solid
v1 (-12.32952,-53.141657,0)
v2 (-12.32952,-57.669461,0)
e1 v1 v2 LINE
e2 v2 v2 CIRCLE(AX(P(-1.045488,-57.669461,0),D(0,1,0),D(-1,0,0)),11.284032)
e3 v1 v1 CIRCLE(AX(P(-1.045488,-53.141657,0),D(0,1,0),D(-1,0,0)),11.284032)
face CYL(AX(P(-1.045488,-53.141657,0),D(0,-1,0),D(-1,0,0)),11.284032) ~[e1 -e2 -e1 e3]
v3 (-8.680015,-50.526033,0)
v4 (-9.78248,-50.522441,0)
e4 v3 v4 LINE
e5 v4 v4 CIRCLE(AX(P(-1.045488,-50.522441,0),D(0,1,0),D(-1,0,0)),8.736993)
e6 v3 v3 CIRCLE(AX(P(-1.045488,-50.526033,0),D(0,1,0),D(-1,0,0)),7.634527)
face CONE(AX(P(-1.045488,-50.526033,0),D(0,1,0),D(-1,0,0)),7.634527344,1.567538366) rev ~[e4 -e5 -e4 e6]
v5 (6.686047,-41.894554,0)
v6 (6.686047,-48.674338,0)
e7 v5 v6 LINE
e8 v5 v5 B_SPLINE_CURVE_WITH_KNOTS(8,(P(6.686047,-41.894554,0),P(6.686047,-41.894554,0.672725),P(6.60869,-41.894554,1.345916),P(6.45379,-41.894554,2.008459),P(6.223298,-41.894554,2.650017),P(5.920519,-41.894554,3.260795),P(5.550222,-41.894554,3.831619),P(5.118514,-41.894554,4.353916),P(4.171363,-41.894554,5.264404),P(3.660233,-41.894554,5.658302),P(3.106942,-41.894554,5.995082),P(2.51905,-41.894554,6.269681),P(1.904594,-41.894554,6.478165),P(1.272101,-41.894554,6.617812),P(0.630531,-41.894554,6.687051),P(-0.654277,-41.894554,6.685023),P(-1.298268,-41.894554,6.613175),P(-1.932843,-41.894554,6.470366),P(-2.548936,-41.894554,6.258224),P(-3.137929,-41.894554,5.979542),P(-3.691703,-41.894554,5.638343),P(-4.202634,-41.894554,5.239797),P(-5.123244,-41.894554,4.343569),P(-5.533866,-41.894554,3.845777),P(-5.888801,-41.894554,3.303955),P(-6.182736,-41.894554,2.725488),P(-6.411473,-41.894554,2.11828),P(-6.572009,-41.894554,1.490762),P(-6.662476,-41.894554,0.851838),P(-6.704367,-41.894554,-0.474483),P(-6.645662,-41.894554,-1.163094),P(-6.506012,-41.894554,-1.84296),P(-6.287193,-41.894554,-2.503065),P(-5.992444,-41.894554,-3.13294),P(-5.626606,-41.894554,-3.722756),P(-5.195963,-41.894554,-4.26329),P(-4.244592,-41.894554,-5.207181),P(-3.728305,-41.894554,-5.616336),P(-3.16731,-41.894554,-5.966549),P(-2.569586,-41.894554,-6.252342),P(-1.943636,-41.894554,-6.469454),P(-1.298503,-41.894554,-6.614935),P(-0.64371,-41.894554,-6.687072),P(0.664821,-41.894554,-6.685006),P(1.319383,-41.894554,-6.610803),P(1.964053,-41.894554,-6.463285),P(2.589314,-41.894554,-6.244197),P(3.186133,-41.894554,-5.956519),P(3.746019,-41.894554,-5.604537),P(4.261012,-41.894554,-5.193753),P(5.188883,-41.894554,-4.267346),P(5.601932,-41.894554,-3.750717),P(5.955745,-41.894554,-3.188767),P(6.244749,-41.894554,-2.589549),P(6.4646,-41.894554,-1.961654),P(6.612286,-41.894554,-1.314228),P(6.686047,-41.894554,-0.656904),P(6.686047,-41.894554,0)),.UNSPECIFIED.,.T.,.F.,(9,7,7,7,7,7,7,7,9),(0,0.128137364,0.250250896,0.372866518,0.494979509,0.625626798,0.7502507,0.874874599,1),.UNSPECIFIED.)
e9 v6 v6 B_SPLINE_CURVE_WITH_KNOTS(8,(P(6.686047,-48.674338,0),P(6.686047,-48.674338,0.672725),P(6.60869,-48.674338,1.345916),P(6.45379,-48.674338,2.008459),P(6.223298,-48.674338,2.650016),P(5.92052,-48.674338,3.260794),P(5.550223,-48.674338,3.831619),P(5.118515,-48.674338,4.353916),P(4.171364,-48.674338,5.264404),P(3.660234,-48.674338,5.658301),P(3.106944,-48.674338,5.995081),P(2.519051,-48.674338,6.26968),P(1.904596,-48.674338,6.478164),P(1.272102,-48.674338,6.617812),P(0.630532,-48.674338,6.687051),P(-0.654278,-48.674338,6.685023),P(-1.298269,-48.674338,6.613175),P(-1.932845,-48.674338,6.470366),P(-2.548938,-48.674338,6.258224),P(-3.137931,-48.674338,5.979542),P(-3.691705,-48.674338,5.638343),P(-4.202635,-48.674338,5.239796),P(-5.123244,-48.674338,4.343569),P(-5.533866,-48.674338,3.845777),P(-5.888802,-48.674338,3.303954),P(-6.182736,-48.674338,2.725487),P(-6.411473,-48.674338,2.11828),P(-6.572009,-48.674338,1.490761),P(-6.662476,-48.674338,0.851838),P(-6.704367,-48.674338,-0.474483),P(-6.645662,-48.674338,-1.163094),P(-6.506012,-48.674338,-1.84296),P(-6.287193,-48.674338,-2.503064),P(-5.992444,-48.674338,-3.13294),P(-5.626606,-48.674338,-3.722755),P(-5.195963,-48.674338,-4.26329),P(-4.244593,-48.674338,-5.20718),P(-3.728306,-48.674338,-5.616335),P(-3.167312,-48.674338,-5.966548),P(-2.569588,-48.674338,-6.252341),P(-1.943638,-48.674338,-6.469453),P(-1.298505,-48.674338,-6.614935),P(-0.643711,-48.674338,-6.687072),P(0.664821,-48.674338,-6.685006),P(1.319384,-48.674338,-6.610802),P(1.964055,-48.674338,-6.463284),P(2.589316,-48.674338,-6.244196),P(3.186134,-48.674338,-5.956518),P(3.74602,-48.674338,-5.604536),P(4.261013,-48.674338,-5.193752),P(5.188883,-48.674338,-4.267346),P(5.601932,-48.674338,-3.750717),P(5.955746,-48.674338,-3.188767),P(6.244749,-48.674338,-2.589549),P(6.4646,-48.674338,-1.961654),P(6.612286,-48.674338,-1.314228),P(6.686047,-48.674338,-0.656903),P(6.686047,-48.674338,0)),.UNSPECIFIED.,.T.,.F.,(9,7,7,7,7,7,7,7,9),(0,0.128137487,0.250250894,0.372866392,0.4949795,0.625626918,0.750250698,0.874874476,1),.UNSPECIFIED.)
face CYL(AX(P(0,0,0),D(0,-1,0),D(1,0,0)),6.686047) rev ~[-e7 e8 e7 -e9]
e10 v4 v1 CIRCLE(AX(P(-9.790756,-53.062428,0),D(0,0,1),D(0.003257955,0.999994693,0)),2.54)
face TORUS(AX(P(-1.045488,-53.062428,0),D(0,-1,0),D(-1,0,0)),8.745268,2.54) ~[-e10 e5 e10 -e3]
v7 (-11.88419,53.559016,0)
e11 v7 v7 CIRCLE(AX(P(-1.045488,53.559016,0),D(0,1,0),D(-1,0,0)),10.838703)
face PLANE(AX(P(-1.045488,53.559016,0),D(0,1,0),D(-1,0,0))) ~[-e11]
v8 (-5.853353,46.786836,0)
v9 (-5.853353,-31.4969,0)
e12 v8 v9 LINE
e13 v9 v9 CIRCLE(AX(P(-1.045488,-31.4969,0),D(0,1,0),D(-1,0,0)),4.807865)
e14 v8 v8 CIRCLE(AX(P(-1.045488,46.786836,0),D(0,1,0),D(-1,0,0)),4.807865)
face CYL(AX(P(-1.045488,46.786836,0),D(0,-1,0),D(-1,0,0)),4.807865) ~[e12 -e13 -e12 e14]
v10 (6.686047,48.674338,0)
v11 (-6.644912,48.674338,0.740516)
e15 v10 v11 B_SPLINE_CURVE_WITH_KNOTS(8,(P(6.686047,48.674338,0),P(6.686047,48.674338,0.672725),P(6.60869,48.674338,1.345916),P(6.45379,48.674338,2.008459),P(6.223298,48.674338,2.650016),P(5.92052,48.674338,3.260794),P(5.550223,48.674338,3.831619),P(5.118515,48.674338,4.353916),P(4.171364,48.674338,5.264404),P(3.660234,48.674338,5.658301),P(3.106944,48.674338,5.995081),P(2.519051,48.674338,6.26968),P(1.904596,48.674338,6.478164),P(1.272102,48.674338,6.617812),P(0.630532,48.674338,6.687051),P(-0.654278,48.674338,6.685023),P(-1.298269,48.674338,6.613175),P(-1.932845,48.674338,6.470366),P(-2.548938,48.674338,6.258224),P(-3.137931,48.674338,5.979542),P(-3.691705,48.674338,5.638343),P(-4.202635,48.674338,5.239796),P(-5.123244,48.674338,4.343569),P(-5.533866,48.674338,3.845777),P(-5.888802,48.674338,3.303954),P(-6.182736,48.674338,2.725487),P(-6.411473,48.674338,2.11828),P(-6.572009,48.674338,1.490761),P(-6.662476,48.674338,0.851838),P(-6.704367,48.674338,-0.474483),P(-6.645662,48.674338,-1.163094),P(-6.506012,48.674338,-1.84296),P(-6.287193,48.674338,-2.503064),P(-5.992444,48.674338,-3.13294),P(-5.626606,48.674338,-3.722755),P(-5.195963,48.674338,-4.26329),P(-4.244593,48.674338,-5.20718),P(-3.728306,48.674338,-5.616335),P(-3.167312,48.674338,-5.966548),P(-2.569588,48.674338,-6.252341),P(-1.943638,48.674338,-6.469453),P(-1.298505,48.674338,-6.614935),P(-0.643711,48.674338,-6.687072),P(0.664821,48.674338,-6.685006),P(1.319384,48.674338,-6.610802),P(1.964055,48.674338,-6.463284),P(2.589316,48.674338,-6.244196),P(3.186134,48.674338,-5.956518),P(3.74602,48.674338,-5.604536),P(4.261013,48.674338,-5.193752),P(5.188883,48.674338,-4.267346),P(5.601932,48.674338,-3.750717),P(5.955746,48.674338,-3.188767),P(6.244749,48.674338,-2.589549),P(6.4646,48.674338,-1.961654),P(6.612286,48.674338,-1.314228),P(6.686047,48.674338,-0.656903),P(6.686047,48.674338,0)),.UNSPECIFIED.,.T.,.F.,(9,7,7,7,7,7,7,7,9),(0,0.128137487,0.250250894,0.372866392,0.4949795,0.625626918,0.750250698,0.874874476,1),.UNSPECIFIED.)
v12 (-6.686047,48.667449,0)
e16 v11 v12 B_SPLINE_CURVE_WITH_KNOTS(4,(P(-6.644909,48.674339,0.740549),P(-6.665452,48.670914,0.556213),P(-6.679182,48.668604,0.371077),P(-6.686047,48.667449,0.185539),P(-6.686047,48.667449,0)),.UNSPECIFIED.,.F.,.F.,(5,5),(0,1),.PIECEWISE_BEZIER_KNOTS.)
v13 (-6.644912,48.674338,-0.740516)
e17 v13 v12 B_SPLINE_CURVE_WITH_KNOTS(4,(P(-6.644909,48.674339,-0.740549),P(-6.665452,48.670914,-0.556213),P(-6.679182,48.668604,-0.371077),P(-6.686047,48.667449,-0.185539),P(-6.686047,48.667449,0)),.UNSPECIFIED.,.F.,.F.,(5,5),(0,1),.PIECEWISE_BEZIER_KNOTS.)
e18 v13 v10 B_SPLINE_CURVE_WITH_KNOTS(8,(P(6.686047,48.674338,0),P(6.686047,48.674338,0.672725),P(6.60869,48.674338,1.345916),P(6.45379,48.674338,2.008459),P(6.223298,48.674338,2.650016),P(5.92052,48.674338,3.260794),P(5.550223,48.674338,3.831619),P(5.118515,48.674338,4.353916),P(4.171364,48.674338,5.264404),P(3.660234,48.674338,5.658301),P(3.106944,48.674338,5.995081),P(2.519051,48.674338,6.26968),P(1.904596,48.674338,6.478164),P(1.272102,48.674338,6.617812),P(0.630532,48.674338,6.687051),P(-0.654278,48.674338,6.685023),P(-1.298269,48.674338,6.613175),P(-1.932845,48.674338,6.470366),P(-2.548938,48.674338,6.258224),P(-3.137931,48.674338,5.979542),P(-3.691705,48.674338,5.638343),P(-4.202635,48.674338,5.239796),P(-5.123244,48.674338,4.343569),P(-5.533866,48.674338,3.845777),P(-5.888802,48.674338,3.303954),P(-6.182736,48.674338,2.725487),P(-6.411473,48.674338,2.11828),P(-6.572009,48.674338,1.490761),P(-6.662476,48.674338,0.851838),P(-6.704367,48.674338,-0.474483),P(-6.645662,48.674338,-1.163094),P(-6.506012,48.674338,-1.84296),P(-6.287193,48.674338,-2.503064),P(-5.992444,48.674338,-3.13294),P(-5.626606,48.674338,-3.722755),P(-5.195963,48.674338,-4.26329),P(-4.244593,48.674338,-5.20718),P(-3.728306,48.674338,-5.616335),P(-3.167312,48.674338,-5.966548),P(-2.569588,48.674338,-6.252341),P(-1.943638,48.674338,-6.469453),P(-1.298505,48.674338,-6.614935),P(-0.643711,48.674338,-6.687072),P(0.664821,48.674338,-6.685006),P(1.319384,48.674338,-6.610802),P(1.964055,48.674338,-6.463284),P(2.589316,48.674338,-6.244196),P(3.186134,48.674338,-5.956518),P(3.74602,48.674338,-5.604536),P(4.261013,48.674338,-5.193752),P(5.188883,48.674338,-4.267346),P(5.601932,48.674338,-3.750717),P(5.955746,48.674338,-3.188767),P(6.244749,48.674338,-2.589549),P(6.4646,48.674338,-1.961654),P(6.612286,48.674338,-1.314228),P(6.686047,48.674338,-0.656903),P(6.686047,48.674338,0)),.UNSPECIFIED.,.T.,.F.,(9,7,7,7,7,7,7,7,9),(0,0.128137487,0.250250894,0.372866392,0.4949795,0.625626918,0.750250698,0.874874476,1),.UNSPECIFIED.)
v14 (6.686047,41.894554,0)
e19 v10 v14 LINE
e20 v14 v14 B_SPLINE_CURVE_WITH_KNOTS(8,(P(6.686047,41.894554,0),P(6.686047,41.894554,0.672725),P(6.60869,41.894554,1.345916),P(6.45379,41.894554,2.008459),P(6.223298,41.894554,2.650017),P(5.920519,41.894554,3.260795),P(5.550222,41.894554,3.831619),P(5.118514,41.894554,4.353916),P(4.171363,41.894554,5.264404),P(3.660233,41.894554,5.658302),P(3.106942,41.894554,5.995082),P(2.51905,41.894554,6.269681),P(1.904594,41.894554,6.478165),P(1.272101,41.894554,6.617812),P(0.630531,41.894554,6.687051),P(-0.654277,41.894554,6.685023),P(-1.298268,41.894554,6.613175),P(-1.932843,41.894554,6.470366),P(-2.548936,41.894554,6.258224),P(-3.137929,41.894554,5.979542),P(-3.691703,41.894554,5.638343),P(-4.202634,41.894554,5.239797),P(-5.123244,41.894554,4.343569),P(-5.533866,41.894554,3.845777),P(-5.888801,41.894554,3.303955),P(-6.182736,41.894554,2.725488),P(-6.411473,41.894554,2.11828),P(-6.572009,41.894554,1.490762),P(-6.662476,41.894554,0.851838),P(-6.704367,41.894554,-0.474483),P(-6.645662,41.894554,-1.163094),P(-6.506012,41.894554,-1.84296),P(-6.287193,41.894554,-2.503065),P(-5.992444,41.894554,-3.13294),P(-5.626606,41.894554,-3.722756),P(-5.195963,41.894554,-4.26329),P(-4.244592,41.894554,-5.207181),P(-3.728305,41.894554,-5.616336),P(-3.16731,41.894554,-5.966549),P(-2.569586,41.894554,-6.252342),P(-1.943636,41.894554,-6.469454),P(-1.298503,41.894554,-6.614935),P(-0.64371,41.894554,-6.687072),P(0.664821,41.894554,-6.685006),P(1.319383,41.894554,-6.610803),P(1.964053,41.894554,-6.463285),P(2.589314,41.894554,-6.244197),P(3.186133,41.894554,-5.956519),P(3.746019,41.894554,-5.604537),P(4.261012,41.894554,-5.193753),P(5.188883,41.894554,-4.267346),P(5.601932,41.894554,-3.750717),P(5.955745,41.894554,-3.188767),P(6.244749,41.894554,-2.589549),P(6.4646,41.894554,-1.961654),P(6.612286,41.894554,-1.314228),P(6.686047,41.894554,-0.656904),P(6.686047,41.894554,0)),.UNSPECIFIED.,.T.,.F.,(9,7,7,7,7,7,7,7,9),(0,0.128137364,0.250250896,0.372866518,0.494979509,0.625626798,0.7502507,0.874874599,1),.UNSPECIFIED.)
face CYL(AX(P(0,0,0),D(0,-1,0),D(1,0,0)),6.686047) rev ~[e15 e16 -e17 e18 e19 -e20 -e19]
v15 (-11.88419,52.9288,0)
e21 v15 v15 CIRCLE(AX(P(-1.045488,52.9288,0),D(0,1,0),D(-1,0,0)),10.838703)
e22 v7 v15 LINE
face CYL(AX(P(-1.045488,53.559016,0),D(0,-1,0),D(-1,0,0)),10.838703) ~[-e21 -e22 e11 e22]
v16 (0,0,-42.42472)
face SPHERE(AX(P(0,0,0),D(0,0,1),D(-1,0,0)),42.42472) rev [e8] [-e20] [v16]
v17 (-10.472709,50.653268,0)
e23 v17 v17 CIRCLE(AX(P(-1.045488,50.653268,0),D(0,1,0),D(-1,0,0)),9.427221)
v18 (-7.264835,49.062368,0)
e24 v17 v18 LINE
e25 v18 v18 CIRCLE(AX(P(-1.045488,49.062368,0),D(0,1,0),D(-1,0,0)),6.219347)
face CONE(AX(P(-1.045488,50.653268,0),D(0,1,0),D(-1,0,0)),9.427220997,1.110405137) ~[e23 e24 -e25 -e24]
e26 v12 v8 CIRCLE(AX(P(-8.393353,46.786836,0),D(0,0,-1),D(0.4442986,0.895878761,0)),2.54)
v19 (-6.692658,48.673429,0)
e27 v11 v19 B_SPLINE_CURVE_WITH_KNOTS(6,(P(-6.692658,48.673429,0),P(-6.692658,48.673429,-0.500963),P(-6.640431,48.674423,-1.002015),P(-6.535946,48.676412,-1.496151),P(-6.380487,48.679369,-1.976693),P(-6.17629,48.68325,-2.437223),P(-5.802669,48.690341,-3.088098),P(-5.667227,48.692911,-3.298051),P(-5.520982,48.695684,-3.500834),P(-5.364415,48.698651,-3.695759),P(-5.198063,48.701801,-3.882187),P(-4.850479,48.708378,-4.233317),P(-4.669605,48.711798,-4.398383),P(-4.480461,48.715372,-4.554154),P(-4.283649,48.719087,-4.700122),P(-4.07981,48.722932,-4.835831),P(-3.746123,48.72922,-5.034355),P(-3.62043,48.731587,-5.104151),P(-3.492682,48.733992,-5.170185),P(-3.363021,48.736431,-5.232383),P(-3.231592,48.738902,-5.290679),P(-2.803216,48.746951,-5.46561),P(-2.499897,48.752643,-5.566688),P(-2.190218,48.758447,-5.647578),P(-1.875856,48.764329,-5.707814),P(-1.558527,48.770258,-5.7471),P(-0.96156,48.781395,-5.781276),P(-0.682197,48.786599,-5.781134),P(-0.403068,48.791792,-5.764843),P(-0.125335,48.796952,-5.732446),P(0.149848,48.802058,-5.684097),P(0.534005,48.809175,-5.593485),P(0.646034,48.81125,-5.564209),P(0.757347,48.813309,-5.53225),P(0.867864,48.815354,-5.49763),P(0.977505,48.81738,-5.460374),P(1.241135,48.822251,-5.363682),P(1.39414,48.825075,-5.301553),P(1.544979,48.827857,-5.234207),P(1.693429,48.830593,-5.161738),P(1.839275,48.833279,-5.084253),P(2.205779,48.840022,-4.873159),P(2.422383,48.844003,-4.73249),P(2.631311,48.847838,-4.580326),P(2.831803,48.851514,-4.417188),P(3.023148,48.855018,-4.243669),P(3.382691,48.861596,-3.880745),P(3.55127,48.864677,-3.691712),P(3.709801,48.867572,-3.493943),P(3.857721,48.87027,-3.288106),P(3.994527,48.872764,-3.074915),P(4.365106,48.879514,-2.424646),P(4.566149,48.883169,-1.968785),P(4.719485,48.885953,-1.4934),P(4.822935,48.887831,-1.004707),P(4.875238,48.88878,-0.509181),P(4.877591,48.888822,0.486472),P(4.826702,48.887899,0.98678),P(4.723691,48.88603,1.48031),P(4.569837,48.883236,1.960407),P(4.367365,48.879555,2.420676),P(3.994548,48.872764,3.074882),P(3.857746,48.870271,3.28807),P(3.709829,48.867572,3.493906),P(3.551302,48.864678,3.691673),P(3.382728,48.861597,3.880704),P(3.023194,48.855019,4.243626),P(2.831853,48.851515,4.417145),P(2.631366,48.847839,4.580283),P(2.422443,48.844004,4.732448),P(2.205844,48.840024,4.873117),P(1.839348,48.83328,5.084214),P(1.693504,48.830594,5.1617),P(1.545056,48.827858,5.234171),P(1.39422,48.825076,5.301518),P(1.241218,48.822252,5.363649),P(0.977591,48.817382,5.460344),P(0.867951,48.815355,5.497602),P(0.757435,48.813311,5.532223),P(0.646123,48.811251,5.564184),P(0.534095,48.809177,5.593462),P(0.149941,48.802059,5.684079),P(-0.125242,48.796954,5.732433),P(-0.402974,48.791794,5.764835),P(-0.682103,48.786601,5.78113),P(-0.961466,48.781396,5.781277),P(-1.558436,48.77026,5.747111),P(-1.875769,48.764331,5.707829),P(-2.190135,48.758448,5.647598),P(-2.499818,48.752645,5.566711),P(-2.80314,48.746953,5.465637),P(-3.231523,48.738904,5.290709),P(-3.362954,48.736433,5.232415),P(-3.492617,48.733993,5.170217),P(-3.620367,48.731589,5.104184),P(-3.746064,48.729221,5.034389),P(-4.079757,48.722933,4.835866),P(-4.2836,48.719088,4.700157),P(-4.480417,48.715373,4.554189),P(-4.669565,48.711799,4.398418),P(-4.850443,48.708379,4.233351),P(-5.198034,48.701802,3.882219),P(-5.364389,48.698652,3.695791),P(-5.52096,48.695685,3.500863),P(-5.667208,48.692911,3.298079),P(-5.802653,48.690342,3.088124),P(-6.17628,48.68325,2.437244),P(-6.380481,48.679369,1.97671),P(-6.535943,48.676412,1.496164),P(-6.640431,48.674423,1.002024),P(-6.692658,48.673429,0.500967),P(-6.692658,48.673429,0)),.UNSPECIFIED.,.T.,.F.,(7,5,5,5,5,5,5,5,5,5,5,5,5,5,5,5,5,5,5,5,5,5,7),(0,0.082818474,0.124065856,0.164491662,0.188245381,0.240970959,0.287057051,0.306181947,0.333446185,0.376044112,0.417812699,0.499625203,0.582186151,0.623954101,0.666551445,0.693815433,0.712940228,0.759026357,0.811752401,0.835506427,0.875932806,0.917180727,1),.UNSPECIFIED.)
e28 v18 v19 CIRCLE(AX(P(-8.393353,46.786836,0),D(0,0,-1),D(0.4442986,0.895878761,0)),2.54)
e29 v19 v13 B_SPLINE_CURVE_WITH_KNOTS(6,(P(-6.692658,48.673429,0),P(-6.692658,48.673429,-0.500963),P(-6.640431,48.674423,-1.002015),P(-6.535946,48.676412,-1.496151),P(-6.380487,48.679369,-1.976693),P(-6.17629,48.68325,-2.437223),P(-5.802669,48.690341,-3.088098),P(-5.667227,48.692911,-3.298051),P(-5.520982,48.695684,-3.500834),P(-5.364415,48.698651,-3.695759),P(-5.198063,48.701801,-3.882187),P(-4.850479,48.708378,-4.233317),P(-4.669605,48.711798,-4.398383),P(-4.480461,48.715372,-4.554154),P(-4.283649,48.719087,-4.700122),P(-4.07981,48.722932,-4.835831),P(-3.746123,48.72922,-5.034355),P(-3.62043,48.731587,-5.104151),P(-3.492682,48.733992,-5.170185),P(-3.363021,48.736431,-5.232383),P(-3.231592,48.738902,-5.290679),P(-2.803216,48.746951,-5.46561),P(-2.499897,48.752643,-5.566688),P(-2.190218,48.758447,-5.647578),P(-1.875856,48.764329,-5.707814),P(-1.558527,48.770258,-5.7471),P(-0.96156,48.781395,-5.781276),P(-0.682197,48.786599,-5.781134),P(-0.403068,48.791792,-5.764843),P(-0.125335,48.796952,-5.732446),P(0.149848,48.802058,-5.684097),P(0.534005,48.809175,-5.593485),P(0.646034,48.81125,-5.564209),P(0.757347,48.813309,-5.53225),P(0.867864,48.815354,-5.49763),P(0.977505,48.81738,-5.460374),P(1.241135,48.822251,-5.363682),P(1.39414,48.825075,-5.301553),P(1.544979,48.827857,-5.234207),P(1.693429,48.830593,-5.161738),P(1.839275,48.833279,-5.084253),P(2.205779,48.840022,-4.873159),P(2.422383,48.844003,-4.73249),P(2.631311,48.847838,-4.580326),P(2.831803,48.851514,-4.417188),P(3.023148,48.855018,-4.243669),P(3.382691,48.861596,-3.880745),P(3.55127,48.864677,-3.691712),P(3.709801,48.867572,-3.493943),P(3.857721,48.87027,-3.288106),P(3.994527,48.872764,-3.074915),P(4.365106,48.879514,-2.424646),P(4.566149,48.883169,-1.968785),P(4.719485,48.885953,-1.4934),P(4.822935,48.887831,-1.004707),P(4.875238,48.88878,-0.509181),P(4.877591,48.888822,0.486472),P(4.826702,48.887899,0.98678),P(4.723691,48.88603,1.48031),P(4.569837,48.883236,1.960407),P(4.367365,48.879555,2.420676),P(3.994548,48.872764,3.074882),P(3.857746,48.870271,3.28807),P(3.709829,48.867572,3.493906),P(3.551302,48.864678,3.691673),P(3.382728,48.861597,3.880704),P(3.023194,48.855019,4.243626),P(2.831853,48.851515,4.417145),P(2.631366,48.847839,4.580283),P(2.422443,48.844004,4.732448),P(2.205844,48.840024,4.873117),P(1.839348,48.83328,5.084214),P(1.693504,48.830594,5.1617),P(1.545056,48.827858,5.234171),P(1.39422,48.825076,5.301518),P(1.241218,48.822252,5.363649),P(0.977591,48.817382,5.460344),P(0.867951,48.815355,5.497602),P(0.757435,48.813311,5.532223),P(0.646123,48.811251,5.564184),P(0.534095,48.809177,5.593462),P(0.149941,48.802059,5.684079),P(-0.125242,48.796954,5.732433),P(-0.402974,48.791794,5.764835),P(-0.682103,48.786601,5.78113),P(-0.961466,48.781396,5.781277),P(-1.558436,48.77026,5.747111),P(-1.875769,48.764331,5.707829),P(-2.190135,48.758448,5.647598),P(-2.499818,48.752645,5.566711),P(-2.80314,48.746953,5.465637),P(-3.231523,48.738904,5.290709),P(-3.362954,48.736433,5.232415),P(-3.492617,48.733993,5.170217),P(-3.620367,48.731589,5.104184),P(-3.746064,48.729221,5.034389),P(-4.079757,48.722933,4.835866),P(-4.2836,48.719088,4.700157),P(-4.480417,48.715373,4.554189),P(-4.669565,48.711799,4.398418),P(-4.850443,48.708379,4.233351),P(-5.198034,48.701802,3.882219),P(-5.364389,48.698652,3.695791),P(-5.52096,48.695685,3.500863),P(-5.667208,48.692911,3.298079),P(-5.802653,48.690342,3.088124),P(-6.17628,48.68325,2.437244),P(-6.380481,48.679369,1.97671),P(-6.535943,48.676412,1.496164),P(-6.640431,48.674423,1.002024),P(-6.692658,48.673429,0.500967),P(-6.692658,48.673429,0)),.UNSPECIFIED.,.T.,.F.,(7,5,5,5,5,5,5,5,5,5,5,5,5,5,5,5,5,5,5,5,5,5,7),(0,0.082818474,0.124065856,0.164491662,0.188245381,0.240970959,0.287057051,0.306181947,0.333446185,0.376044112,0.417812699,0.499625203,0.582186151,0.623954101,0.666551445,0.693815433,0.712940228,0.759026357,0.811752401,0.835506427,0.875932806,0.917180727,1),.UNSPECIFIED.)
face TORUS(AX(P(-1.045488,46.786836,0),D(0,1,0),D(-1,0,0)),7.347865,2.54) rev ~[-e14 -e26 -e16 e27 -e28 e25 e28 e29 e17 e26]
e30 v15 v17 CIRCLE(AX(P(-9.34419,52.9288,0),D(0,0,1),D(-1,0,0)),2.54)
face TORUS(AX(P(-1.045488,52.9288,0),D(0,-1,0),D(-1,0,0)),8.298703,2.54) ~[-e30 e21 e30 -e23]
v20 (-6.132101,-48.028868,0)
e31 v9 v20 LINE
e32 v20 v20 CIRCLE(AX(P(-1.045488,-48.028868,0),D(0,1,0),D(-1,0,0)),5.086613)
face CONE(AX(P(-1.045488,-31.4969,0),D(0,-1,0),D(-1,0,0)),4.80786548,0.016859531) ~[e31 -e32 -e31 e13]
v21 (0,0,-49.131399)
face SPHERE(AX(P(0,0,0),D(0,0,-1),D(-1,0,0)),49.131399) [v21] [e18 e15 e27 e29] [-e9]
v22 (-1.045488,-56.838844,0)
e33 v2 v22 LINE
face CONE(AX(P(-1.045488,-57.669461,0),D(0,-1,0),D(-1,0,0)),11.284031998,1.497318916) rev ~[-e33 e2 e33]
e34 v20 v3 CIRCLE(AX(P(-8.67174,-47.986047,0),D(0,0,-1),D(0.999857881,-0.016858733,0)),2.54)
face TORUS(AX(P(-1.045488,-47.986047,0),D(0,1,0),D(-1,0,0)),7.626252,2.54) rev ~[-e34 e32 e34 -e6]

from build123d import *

# Parameters (mm, degrees)
F2_R     = 6.6860470745
F3_DEPTH = 59.436


# Not quite as in the source:
# - a feature of the source that left no trace in its solid (it failed there, or was rolled back) is left out


with BuildPart() as f1:
    # F0 (on Front) → F1 (revolve)
    with BuildSketch(Plane.XZ):
        with BuildLine():
            Line((0, -49.1313993841), (0, -47.4085077537))
            Line((0, -47.4085077537), (0, -42.4247202843))
            ThreePointArc((0, -42.4247202843), (-42.4247202843, 0), (0, 42.4247202843))
            Line((0, 42.4247202843), (0, 47.4085077537))
            Line((0, 47.4085077537), (0, 49.1313993841))
            ThreePointArc((0, 49.1313993841), (-49.1313993841, 0), (0, -49.1313993841))
        make_face()
    revolve(axis=Axis((0, 0, 44.916614019), (0, 0, -1)))

    # F2 (on Front) → F3 (cut, symmetric)
    with BuildSketch(Plane.XZ):
        Circle(F2_R)
    extrude(amount=F3_DEPTH, both=True, mode=Mode.SUBTRACT)

    # F5 (on Top) → F6 (revolve)
    with BuildSketch(Plane.XY):
        with BuildLine():
            ThreePointArc((-7.264834625, 49.0623677583), (-6.2348771191, 48.1257089546), (-5.8533530682, 46.7868357055))
            Line((-5.8533530682, 46.7868357055), (-5.8533530682, 0))
            Line((-5.8533530682, 0), (-5.8533530682, -31.4968999284))
            Line((-5.8533530682, -31.4968999284), (-6.1321007088, -48.0288676918))
            ThreePointArc((-6.1321007088, -48.0288676918), (-6.8938450816, -49.8000725931), (-8.6800149322, -50.5260330306))
            Line((-8.6800149322, -50.5260330306), (-9.7824803751, -50.5224412292))
            ThreePointArc((-9.7824803751, -50.5224412292), (-11.6117214108, -51.2916416407), (-12.3295195866, -53.1416572673))
            Line((-12.3295195866, -53.1416572673), (-12.3295195866, -57.6694607735))
            Line((-12.3295195866, -57.6694607735), (-1.0454875883, -56.8388439715))
            Line((-1.0454875883, -56.8388439715), (-1.0454875883, -34.0454652905))
            Line((-1.0454875883, -34.0454652905), (-1.0454875883, 53.5590164363))
            Line((-1.0454875883, 53.5590164363), (-11.8841901422, 53.5590164363))
            Line((-11.8841901422, 53.5590164363), (-11.8841901422, 52.9288002439))
            ThreePointArc((-11.8841901422, 52.9288002439), (-11.5026660913, 51.5899269948), (-10.4727085853, 50.653268191))
            Line((-10.4727085853, 50.653268191), (-7.264834625, 49.0623677583))
        make_face()
    revolve(axis=Axis((-1.0454875883, 9.7567755729, 0), (0, 1, 0)))


solid = f1.part
